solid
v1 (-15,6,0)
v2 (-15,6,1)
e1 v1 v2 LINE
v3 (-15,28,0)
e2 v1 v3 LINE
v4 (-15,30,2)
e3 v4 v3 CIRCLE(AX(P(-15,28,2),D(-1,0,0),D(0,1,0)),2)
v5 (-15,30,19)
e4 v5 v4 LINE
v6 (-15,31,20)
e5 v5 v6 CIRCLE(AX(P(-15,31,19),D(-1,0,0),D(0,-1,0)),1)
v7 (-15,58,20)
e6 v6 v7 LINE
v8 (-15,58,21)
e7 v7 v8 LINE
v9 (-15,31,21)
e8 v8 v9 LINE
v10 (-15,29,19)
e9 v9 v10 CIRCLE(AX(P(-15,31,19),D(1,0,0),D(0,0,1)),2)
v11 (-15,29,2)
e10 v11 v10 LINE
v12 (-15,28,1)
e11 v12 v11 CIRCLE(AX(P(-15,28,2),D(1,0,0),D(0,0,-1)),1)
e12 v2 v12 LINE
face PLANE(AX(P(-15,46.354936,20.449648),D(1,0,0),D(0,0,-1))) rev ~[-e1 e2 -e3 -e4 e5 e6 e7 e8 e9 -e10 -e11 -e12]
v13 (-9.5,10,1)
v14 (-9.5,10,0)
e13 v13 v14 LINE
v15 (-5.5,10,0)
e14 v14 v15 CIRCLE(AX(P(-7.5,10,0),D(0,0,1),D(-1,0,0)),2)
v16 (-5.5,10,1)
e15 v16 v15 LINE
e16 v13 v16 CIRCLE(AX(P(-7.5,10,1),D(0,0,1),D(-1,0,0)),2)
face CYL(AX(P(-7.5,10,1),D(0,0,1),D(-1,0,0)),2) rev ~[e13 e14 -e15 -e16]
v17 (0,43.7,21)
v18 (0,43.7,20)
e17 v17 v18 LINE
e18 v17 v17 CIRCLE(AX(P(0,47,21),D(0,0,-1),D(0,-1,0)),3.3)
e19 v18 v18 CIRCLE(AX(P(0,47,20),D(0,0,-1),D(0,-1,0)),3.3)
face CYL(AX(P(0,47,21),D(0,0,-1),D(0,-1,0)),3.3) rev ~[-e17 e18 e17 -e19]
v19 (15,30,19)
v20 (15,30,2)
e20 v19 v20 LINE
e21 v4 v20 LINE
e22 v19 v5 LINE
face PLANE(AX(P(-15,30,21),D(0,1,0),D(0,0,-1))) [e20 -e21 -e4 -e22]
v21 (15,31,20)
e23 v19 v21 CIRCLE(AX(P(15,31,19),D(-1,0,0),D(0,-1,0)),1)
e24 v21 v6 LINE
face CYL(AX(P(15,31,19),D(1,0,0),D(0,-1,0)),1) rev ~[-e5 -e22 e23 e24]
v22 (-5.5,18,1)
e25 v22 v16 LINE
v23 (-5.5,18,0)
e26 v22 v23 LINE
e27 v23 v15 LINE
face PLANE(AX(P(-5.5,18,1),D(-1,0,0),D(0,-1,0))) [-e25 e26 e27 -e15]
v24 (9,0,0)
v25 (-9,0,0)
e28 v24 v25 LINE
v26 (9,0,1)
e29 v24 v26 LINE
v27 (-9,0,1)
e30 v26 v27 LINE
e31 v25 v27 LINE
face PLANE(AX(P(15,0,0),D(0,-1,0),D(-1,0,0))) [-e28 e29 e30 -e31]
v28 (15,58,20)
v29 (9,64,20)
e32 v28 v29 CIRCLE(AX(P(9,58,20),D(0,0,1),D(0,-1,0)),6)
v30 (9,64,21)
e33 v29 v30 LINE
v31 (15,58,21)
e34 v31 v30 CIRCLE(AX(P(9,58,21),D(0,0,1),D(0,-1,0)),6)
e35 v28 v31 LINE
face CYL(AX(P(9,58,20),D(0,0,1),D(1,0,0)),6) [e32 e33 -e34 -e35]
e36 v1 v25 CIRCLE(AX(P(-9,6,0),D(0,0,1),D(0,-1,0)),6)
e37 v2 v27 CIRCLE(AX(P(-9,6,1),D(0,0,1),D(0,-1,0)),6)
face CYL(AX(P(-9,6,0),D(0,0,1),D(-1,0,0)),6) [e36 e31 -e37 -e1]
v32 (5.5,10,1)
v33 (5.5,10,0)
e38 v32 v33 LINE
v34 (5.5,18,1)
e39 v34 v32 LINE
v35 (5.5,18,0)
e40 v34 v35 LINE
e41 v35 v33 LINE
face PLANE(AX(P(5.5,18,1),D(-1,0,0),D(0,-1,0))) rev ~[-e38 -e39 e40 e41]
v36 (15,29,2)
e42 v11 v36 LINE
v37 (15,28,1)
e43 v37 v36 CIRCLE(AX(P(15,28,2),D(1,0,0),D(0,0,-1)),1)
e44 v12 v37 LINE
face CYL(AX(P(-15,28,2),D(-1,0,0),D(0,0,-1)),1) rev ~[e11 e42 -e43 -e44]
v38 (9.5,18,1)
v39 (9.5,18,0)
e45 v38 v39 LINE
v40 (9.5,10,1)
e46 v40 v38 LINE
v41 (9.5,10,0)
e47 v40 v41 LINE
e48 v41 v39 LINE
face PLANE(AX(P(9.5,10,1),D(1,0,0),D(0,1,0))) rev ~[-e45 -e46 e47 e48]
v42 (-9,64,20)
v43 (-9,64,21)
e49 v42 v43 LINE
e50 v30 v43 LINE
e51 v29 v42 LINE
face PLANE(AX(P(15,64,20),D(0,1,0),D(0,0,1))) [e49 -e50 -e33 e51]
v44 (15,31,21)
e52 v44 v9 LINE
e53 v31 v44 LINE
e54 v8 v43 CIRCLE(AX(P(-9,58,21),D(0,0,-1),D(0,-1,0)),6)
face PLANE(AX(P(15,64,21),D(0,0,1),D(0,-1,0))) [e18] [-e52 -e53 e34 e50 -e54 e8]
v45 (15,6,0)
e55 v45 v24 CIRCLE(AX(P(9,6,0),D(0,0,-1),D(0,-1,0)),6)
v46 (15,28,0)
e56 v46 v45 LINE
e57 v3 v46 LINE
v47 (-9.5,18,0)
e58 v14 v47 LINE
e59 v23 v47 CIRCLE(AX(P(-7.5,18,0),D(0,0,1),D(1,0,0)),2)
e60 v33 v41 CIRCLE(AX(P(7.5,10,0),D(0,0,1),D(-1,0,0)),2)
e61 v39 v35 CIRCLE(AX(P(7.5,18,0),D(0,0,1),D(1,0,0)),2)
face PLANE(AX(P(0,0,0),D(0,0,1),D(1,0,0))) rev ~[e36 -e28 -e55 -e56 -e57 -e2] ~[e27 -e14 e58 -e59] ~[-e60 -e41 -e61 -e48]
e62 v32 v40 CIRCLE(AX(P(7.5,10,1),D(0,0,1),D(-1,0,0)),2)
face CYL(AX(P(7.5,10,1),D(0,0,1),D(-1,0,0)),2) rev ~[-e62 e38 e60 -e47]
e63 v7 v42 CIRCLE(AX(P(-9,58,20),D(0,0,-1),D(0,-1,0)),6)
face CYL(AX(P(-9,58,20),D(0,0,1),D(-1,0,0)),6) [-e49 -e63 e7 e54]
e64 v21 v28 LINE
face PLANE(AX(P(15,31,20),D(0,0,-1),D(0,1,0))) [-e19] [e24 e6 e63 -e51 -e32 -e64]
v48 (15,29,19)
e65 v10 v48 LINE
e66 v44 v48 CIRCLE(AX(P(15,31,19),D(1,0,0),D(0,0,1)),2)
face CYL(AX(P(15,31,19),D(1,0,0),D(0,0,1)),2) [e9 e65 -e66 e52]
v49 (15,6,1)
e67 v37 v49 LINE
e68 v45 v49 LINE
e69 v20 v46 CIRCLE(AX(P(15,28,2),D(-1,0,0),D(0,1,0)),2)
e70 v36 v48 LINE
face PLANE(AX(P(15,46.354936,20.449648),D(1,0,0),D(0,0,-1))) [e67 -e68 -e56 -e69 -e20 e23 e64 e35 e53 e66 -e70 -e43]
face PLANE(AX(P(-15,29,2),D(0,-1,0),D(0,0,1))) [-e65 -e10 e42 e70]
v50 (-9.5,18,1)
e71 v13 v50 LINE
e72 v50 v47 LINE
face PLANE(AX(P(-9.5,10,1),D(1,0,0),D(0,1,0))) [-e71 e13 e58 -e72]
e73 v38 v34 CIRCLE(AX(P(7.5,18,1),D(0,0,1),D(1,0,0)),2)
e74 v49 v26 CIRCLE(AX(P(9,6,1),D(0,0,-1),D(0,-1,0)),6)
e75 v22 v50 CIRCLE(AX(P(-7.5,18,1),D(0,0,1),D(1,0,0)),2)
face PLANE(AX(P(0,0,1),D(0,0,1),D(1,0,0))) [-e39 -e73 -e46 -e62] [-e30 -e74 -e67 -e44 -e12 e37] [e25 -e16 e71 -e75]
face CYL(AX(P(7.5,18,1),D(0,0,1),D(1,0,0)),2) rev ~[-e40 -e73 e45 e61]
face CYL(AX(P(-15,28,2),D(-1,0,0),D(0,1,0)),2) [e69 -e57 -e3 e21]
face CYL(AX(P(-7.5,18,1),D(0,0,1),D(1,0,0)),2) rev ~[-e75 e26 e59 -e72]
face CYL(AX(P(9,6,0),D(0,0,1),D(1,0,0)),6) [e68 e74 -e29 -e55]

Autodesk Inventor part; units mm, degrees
ref_plane "YZ Plane" through (0, 0, 0) normal (1, 0, 0) x (0, 1, 0)
ref_plane "XZ Plane" through (0, 0, 0) normal (0, 1, 0) x (-1, 0, 0)
ref_plane "XY Plane" through (0, 0, 0) normal (0, 0, 1) x (1, 0, 0)
sketch "Skizze1" plane through (0, 0, 0) normal (0, 0, 1) x (1, 0, 0)
  line L0 (-15, 30) -> (15, 30)
  line L1 (15, 30) -> (15, 0)
  line L2 (15, 0) -> (-15, 0)
  line L3 (-15, 0) -> (-15, 30)
  line L4 (-15, 30) -> (15, 0) construction
  line L5 (15, 30) -> (-15, 0) construction
  point P0 (0, 0)
  point P1 (0, 15)
  dimension "d0" = 30
  dimension "d1" = 30
extrude "Grobblech1" add sketch "Skizze1" along normal blind 1
sketch "Skizze2" plane through (-15, 29, 0) normal (0, 1, 0) x (-1, 0, 0)
  line L0 (-30, 0) -> (0, 0)
  line L1 (0, 0) -> (0, 21)
  line L2 (0, 21) -> (-30, 21)
  line L3 (-30, 21) -> (-30, 0)
edge flange "Lasche1" height 20 angle 90 thickness 1 bend radius 1 thickness toward (0, 1, 0) relief tear relief width 1 relief depth 0.5 edges at (0, 30, 1) wall of the first edge with corners at (15, 29, 0) (-15, 29, 0) (-15, 29, 21) (15, 29, 21)
bend "Biegung1"
corner "Ecke1"
sketch "Skizze3" plane through (15, 29, 20) normal (0, 0, 1) x (1, 0, 0)
  line L0 (-30, 0) -> (0, 0)
  line L1 (0, 0) -> (0, 35)
  line L2 (0, 35) -> (-30, 35)
  line L3 (-30, 35) -> (-30, 0)
edge flange "Lasche2" height 34 angle 90 thickness 1 bend radius 1 thickness toward (0, 0, 1) relief tear relief width 1 relief depth 0.5 edges at (0, 30, 21) wall of the first edge with corners at (-15, 29, 20) (15, 29, 20) (15, 64, 20) (-15, 64, 20)
bend "Biegung2"
corner "Ecke2"
hole "Bohrung2" at (0, 47, 21) direction (0, 0, -1) diameter 6.6 end through all clearance for "Sechskantkopfschraube DIN EN 24017" size "M6" standard "DIN"
sketch "Skizze6" plane through (0, 0, 1) normal (0, 0, 1) x (1, 0, 0)
  line L0 (15, 28) -> (-15, 28) projected
  line L1 (-15, 0) -> (-15, 28) projected
  line L2 (7.5, 10) -> (7.5, 18) construction
  line L3 (9.5, 10) -> (9.5, 18)
  line L4 (5.5, 18) -> (5.5, 10)
  arc A0 (5.5, 10) -> (9.5, 10) centre (7.5, 10) ccw
  arc A1 (9.5, 18) -> (5.5, 18) centre (7.5, 18) ccw
  line L5 (0, 28) -> (0, 0) construction
  line L6 (-7.5, 10) -> (-7.5, 18) construction
  line L7 (-9.5, 10) -> (-9.5, 18)
  line L8 (-5.5, 18) -> (-5.5, 10)
  arc A2 (-9.5, 10) -> (-5.5, 10) centre (-7.5, 10) ccw
  arc A3 (-5.5, 18) -> (-9.5, 18) centre (-7.5, 18) ccw
  point P0 (7.5, 14)
  point P1 (-7.5, 14)
  point P2 (0, 14)
  dimension "d47" = 15
  dimension "d48" = 12
  dimension "d50" = 4
extrude "Extrusion2" cut sketch "Skizze6" against normal through all
fillet "Eckenrundung1" radius 6 4 edges at (15, 0, 0.5) (-15, 0, 0.5) (-15, 64, 20.5) (15, 64, 20.5)
equation "\"d45\" = Stärke"
equation "\"d3\" = BreiteBiegungsfreistellung"
equation "\"d4\" = TiefeBiegungsfreistellung"
equation "\"d5\" = MinimalRest"
equation "\"d6\" = Biegeradius"
equation "\"d9\" = Biegeradius"
equation "\"d10\" = GrößeEckenfreistellung"
equation "\"d11\" = Abstandsgröße"
equation "\"d12\" = JacobiRadiusGröße"
equation "\"d13\" = BreiteBiegungsfreistellung"
equation "\"d14\" = TiefeBiegungsfreistellung"
equation "\"d15\" = MinimalRest"
equation "\"d16\" = Biegeradius"
equation "\"d19\" = Biegeradius"
equation "\"d20\" = GrößeEckenfreistellung"
equation "\"d21\" = Abstandsgröße"
equation "\"d22\" = JacobiRadiusGröße"
equation "\"Biegeradius\" = Stärke"
equation "\"BreiteBiegungsfreistellung\" = Stärke"
equation "\"TiefeBiegungsfreistellung\" = 0.5 * Stärke"
equation "\"GrößeEckenfreistellung\" = 4 * Stärke"
equation "\"MinimalRest\" = 2 * Stärke"
equation "\"Übergangsradius\" = Biegeradius"
equation "\"JacobiRadiusGröße\" = Biegeradius"
equation "\"Abstandsgröße\" = Stärke"
equation "\"d2\" = Biegeradius"
equation "\"Stärke\" = 1"
properties part number "Tunel_IRBeamHolder"
